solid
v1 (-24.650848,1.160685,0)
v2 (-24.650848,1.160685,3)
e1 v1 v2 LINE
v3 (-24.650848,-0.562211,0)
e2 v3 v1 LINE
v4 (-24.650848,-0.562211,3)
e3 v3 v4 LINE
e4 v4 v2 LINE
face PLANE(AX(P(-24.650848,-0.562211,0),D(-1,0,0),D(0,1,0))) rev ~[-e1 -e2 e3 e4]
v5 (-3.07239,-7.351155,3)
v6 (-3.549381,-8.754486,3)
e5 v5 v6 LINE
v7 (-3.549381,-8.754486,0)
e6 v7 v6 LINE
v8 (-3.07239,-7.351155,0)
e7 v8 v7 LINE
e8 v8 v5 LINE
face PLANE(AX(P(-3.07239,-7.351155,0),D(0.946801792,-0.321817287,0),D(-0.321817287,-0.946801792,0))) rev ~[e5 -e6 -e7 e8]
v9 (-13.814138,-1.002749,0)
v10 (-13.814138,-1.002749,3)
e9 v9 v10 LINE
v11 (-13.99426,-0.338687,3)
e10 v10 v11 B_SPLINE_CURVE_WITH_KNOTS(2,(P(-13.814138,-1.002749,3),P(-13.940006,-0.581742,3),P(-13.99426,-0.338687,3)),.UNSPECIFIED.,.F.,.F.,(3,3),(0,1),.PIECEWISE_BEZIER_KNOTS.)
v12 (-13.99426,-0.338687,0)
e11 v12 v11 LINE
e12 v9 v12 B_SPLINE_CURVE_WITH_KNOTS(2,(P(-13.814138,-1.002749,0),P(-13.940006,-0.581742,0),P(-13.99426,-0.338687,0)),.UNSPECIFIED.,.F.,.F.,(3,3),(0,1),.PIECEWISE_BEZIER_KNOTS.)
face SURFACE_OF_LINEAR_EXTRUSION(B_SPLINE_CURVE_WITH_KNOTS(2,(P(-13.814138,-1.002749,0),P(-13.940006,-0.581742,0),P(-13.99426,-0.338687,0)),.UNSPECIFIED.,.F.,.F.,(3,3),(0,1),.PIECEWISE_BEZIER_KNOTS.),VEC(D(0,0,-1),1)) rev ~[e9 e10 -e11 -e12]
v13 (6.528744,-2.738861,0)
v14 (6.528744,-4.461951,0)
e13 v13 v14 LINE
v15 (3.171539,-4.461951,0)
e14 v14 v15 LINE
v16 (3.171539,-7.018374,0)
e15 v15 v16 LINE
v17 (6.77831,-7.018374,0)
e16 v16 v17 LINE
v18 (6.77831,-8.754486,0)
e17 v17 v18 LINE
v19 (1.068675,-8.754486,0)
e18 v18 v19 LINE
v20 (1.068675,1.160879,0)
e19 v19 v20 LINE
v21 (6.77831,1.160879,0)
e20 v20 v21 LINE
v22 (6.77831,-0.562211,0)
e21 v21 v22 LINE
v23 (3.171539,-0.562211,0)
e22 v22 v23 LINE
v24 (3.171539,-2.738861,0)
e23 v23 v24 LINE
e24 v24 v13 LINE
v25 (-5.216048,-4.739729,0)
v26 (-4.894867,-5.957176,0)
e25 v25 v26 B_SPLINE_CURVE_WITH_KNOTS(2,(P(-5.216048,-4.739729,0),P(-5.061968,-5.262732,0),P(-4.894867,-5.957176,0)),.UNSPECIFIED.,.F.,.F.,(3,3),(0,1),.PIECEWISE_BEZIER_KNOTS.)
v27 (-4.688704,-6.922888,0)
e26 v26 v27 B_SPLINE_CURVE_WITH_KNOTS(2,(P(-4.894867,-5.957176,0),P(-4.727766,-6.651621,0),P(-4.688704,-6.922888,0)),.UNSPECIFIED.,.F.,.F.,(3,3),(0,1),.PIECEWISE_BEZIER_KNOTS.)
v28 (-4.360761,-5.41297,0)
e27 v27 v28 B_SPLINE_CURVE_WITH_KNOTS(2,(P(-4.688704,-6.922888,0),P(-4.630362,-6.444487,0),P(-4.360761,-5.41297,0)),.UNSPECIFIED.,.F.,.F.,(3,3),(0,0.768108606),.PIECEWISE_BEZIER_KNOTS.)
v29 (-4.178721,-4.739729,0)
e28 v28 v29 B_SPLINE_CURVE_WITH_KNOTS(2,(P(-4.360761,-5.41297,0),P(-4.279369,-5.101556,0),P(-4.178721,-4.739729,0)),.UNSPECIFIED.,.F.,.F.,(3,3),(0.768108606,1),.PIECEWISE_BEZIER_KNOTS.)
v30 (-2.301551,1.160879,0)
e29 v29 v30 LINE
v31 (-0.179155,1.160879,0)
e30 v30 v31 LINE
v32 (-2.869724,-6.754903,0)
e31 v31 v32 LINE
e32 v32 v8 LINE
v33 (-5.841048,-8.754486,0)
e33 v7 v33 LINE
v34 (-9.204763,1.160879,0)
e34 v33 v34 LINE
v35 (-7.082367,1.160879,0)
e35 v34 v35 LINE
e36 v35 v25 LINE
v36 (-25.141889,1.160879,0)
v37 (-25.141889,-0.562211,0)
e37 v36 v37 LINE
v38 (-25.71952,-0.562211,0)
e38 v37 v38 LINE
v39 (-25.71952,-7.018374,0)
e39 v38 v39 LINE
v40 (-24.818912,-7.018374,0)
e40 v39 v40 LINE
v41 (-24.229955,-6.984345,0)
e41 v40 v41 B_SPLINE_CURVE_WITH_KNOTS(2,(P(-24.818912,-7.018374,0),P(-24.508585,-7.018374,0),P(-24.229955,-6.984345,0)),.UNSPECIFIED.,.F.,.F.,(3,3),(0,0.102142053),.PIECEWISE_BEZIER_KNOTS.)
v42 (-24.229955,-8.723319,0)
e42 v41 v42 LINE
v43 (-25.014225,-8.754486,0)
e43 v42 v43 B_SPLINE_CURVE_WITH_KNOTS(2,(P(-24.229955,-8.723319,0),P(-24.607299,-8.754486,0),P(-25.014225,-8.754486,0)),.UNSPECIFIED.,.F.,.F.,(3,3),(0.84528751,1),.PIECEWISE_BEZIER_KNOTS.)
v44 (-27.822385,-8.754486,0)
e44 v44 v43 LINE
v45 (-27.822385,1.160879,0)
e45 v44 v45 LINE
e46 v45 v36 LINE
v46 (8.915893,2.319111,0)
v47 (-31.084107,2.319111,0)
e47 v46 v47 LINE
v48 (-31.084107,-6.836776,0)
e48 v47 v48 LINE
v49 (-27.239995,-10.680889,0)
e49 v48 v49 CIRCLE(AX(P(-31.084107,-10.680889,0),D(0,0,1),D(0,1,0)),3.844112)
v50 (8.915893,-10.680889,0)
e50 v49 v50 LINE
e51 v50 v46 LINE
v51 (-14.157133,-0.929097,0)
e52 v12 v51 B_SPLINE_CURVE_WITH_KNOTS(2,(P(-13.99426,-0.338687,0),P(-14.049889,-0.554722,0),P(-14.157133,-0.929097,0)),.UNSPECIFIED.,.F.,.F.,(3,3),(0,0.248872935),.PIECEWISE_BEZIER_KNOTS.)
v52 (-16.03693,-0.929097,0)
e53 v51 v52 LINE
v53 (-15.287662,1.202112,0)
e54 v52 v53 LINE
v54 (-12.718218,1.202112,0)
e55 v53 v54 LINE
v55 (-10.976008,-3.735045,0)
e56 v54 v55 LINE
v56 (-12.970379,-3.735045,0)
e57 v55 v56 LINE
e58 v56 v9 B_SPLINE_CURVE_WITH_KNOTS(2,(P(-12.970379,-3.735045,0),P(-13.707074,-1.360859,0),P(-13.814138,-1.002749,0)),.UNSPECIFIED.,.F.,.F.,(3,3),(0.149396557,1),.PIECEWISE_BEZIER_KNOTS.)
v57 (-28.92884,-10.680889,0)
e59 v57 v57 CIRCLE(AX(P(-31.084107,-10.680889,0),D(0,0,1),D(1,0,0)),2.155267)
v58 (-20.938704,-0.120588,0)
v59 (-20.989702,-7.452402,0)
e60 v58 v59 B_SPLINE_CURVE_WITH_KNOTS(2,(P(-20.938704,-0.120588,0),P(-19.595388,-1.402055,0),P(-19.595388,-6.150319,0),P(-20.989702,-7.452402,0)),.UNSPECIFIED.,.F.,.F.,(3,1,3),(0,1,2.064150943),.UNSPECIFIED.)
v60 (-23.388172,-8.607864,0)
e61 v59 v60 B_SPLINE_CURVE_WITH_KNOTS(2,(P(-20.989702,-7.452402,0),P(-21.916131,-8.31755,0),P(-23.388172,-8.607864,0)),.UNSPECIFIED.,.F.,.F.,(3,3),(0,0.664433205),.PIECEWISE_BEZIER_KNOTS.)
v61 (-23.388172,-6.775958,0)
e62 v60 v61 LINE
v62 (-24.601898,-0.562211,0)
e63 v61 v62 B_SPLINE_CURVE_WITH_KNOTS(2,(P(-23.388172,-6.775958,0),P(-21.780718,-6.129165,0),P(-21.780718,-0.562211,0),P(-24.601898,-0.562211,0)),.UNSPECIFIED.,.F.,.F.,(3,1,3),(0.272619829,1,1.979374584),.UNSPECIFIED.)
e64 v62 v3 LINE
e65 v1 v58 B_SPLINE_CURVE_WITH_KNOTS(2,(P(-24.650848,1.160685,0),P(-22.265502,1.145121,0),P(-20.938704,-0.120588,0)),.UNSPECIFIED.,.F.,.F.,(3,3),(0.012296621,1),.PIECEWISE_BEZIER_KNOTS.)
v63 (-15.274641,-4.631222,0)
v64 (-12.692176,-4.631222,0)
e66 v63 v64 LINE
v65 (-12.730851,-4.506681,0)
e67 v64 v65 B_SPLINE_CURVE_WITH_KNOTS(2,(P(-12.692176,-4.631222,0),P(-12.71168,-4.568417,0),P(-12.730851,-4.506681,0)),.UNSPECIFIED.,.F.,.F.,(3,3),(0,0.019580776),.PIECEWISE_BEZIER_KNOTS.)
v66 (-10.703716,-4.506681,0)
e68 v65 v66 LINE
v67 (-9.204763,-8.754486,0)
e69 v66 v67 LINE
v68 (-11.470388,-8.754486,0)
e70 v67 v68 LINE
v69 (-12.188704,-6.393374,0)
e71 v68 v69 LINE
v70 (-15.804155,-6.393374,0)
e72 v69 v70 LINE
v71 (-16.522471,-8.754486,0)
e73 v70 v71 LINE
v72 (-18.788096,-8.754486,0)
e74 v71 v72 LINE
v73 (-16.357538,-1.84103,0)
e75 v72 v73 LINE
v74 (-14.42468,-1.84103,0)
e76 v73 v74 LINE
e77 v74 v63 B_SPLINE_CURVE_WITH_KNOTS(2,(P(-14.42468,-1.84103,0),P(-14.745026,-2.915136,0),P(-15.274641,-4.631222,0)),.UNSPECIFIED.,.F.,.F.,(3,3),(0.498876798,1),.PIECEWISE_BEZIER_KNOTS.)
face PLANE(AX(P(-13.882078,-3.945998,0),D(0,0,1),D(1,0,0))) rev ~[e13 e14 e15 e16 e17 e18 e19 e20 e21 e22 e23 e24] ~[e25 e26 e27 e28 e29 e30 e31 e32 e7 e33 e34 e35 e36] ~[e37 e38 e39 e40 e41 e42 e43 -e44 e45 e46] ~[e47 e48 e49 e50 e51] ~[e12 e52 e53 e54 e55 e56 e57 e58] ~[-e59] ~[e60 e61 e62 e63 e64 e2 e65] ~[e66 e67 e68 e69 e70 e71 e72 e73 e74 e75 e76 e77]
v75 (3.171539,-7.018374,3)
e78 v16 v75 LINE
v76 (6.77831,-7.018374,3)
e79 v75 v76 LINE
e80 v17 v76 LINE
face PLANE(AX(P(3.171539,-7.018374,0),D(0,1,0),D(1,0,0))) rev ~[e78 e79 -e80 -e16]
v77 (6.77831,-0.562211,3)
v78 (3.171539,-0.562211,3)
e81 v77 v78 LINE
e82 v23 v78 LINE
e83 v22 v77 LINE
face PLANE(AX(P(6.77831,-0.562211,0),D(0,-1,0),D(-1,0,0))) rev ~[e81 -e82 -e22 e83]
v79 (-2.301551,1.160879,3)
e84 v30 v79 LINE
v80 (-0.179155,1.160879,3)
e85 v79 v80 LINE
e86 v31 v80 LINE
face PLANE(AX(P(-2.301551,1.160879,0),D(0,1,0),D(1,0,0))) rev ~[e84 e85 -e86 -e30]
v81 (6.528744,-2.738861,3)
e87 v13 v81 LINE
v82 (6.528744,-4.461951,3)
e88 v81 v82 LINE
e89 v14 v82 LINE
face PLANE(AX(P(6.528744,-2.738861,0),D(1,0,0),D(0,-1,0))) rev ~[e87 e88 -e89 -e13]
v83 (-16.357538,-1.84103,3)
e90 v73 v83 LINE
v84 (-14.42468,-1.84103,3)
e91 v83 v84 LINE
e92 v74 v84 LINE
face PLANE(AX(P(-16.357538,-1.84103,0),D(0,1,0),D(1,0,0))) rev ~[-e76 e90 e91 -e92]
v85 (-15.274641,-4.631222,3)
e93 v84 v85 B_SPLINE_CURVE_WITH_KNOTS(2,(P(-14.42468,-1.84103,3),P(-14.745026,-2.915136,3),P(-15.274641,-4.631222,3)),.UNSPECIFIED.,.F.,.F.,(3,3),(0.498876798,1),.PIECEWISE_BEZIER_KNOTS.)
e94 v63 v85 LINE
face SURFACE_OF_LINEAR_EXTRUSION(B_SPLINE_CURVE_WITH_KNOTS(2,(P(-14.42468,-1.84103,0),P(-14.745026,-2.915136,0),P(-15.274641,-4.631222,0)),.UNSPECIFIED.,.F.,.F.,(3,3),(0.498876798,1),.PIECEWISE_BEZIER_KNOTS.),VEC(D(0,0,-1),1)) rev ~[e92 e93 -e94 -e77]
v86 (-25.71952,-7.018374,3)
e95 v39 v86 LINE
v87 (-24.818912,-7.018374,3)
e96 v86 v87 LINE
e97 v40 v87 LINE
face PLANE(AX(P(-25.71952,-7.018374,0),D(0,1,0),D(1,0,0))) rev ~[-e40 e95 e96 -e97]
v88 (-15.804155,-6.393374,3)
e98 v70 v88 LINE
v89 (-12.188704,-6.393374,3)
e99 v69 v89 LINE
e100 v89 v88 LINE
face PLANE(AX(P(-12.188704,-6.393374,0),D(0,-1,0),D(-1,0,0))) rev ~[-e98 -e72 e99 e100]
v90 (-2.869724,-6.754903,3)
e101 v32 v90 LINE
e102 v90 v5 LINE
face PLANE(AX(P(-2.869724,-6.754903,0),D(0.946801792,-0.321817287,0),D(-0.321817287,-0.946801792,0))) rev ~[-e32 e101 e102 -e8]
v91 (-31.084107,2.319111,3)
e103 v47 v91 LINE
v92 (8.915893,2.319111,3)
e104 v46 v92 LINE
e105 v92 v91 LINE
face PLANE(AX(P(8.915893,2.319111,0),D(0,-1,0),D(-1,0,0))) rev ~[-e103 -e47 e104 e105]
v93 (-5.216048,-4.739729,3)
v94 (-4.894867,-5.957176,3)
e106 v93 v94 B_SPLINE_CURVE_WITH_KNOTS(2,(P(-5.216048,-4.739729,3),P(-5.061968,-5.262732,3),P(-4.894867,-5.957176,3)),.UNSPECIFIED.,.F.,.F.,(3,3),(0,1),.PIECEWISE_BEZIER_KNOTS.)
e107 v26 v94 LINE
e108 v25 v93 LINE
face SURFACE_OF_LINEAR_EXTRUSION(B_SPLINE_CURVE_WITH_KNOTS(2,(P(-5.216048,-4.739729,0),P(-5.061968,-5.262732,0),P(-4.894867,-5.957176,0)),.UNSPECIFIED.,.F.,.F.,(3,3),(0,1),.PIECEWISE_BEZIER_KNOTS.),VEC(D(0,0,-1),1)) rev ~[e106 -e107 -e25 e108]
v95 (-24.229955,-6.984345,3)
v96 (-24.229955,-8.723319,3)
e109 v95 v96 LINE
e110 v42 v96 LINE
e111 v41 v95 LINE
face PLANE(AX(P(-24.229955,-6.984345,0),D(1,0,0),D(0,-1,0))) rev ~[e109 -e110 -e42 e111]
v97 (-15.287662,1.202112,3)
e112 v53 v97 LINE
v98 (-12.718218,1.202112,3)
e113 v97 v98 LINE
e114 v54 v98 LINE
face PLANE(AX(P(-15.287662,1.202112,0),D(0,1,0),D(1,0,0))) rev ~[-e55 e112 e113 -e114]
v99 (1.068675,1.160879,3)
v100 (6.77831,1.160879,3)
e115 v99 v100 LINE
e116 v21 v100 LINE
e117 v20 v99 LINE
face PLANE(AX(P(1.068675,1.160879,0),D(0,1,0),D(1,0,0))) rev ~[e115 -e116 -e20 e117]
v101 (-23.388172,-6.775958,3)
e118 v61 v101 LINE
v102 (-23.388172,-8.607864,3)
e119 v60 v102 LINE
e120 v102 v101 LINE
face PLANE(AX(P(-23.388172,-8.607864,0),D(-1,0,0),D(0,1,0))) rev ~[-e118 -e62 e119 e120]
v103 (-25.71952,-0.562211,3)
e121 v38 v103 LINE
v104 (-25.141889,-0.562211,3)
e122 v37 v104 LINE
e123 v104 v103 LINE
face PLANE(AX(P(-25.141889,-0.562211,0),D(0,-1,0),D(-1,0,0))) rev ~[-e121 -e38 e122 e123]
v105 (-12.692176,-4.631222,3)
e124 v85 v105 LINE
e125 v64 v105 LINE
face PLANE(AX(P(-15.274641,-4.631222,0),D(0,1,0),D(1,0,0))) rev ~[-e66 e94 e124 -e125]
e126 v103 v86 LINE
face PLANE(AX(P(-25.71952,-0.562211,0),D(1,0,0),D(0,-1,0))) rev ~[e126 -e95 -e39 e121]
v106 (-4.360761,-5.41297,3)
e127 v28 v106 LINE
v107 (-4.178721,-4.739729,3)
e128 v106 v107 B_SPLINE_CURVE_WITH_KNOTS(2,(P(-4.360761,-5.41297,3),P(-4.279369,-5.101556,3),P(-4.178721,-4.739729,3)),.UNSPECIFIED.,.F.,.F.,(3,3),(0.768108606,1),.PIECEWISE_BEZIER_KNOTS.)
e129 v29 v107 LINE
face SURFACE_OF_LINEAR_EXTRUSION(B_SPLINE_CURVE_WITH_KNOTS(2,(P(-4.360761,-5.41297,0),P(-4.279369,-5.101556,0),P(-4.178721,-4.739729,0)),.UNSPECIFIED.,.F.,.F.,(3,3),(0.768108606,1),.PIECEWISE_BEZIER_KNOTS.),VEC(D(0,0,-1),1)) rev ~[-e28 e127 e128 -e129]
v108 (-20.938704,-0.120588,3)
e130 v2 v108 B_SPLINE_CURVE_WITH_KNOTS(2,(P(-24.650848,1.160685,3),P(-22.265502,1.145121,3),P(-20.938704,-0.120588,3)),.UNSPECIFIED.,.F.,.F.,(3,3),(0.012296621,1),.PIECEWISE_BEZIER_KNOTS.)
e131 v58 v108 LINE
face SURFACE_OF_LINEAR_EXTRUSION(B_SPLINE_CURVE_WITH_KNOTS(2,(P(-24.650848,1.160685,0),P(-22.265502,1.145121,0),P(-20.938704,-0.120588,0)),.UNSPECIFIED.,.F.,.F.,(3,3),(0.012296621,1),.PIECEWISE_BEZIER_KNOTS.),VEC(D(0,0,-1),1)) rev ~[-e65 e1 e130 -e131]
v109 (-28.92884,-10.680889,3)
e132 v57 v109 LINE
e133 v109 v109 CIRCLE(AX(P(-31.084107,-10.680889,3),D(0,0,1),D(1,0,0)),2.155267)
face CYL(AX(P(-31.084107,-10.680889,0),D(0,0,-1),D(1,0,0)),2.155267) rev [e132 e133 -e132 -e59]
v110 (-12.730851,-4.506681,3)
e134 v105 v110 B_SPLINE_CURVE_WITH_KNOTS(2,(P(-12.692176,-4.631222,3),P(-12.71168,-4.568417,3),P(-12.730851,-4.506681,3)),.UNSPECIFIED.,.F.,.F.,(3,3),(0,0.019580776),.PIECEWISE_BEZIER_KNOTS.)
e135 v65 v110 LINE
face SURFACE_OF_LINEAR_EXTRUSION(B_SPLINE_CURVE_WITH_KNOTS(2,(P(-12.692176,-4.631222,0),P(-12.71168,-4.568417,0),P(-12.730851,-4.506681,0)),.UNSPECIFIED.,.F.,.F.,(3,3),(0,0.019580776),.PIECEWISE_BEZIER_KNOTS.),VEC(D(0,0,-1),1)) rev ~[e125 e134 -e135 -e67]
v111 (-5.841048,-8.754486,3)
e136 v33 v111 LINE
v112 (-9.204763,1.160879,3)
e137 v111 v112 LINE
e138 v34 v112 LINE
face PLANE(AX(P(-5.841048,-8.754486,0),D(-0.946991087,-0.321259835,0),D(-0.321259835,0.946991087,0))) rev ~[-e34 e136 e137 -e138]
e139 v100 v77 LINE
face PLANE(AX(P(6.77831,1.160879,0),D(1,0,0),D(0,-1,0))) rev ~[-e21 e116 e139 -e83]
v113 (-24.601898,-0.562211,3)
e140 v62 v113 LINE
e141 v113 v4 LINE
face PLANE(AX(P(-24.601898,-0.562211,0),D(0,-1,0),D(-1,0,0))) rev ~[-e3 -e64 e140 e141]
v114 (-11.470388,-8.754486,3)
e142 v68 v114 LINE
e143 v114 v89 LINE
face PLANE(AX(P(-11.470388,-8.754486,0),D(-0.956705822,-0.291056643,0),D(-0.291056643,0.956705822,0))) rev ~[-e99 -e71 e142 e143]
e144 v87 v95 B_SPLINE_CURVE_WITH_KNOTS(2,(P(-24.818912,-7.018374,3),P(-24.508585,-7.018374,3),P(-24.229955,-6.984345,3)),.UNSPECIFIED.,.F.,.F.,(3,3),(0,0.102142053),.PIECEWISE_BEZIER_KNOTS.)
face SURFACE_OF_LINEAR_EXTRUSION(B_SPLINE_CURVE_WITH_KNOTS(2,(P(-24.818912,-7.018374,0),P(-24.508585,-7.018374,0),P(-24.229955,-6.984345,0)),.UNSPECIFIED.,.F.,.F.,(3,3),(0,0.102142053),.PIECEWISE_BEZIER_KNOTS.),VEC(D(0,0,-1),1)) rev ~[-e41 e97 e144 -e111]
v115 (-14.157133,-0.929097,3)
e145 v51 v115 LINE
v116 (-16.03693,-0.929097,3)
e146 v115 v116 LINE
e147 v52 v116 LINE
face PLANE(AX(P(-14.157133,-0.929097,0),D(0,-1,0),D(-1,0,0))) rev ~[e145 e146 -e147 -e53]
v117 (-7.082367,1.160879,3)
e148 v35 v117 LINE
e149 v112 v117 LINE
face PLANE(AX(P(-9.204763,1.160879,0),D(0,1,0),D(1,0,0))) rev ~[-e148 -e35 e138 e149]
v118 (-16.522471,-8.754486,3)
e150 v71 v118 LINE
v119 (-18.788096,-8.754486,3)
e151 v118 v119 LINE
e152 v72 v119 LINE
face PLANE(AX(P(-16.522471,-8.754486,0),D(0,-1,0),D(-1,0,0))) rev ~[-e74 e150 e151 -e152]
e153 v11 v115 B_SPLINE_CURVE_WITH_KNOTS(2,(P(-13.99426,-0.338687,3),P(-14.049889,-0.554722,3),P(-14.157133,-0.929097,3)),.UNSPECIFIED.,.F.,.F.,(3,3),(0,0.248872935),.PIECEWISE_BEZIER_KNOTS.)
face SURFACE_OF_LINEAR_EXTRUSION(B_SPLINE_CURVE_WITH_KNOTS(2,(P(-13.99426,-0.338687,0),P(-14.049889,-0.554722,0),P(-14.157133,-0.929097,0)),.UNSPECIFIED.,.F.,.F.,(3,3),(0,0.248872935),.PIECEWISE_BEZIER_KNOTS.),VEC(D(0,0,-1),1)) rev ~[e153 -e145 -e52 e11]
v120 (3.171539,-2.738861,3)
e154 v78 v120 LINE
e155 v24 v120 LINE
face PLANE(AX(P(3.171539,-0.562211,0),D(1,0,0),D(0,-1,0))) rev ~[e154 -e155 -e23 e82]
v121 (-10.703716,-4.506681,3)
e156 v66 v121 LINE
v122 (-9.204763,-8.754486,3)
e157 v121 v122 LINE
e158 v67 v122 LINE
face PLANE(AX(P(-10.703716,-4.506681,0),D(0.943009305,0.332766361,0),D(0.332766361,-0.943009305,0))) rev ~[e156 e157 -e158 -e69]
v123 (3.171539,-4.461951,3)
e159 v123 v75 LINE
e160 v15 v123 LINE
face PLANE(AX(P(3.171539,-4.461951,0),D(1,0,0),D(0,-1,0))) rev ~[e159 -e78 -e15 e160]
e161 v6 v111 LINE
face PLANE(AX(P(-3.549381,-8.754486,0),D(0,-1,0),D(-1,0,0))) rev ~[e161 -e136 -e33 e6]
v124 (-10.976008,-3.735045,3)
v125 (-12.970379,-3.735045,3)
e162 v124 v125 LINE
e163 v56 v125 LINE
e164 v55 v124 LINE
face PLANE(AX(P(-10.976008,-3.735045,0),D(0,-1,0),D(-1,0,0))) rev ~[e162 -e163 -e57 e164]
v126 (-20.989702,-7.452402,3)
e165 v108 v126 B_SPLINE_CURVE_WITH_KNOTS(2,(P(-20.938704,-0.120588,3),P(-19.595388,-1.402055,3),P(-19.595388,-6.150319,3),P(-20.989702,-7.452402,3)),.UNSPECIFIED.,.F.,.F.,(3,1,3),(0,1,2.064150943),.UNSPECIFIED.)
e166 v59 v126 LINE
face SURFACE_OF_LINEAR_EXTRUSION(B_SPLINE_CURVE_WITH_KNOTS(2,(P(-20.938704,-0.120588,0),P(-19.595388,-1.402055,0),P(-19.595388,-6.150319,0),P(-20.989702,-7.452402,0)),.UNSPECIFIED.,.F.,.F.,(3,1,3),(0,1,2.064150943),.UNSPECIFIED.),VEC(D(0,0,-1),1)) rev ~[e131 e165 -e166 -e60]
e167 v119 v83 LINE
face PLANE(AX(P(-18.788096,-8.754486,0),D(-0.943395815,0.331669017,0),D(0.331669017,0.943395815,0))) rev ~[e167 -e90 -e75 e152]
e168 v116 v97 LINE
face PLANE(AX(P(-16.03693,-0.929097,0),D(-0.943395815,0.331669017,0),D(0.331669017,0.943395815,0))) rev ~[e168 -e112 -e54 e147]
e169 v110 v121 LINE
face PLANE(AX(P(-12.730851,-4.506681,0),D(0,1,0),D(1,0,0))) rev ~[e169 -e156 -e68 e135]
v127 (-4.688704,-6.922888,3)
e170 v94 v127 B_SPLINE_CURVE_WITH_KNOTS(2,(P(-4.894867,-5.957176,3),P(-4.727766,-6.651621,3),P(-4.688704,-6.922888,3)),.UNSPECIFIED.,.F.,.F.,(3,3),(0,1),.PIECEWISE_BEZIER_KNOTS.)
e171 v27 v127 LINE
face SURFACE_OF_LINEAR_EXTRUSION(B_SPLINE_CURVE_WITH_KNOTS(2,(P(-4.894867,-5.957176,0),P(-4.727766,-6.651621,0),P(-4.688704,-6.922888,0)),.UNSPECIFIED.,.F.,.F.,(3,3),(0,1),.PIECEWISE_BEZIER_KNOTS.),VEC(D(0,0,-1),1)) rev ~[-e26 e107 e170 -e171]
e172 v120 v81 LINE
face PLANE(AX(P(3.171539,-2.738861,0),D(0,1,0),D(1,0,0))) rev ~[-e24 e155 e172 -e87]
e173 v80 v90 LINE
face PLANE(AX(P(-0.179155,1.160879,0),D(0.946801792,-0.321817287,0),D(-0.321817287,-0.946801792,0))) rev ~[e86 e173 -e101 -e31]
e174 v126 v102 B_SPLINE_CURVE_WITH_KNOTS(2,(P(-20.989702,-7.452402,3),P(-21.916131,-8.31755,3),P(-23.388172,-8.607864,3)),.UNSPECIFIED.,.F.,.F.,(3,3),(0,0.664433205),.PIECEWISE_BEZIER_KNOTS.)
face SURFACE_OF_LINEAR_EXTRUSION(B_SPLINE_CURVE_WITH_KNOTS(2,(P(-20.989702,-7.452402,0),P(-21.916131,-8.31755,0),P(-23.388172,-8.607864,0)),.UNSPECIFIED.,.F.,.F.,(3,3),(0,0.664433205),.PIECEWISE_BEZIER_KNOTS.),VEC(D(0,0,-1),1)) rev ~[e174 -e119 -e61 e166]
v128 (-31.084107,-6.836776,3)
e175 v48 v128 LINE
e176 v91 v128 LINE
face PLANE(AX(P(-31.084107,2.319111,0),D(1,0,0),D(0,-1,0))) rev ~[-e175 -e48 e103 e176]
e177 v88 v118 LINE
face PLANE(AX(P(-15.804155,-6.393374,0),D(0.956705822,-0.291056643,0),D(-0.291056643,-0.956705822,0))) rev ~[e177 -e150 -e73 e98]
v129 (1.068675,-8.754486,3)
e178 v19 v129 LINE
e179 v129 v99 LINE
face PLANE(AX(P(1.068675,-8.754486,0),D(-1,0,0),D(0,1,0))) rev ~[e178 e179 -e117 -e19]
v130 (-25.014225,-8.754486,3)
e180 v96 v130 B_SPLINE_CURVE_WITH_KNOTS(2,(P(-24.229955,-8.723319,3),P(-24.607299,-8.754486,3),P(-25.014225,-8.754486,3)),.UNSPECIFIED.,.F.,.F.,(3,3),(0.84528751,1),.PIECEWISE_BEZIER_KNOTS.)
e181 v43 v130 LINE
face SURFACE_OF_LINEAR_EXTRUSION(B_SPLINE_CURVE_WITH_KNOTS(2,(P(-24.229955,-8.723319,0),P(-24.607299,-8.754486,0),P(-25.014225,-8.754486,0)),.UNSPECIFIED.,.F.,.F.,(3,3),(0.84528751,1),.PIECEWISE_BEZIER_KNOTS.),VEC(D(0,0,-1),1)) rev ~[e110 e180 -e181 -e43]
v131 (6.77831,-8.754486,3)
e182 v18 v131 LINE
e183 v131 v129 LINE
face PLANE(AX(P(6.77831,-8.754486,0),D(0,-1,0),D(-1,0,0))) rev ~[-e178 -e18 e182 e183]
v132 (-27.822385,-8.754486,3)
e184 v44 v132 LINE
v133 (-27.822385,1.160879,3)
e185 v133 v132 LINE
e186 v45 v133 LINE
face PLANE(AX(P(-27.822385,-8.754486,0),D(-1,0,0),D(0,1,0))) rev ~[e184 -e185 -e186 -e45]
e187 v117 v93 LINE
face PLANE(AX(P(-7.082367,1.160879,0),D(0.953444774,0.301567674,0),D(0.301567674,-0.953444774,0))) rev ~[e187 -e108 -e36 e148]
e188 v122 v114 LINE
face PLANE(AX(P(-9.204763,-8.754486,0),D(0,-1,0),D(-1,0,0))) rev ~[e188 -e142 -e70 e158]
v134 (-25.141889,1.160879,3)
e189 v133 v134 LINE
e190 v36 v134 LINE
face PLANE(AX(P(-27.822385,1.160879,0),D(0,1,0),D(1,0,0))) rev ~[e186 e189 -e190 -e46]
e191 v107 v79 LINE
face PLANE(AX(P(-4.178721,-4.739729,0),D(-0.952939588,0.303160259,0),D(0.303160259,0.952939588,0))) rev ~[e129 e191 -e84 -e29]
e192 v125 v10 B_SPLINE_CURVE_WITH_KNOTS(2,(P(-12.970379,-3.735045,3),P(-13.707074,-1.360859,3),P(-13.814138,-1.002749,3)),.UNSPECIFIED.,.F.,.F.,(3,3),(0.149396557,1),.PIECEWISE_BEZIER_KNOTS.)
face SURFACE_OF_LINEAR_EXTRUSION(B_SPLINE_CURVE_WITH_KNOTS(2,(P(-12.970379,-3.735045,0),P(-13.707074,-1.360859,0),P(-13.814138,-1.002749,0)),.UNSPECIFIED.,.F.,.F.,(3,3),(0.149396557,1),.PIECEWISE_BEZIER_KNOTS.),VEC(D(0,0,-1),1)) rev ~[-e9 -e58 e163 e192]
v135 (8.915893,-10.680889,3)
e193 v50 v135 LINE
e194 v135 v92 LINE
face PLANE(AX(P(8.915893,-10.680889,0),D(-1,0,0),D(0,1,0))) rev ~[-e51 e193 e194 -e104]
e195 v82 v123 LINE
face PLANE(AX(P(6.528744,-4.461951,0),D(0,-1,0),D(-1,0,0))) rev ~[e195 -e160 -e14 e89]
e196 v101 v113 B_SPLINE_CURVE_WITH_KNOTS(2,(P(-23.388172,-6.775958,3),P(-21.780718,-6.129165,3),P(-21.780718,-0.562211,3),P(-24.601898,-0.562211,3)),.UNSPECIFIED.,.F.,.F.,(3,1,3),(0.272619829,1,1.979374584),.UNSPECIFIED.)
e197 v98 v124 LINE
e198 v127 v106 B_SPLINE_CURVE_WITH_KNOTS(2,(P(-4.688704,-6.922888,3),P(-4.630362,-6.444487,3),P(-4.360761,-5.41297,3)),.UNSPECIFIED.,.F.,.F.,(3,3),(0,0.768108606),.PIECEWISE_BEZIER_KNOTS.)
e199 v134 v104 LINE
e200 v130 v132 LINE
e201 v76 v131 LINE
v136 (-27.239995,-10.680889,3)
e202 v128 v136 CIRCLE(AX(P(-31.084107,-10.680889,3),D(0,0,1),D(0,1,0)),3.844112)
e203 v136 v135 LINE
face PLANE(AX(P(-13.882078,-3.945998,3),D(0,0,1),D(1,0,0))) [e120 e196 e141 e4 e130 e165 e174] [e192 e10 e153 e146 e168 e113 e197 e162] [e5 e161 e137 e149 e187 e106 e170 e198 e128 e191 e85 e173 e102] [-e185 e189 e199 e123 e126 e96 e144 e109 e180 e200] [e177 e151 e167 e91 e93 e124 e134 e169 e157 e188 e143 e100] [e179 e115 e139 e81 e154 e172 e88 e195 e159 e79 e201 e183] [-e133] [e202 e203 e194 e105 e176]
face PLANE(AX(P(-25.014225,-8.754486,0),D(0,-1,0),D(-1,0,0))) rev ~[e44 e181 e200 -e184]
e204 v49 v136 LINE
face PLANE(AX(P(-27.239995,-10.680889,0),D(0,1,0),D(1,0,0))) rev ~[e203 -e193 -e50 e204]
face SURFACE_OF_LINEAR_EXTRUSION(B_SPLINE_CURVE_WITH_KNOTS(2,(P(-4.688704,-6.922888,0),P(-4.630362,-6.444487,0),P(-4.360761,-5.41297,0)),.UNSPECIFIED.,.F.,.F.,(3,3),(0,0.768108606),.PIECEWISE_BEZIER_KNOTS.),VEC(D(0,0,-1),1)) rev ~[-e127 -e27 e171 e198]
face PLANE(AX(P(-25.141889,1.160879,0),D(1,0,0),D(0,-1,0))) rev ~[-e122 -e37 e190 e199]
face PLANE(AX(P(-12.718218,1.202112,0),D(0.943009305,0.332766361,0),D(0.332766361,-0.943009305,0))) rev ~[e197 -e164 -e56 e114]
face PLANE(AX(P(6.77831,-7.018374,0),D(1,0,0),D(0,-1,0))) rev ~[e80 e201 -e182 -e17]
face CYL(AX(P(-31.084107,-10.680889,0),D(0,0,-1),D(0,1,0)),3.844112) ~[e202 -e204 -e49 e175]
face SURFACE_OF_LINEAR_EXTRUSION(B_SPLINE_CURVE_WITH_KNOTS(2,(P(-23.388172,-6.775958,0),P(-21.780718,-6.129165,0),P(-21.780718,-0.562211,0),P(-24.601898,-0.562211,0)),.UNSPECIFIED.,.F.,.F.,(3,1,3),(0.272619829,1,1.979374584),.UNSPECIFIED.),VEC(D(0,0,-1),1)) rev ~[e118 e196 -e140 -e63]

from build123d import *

# Parameters (mm, degrees)
F0_R     = 2.1552668946
F1_DEPTH = 3
F2_DEPTH = 3
F3_DEPTH = 3


# Not quite as in the source:
# - a feature names something its author has since deleted; it is built from what else it names


with BuildPart() as f1:
    # F0 (on Top) → F1 (new body)
    with BuildSketch(Plane.XY):
        with BuildLine():
            Line((8.9158927649, 2.3191112205), (-31.0841072351, 2.3191112205))
            Line((-31.0841072351, 2.3191112205), (-31.0841072351, -6.8367764676))
            ThreePointArc((-31.0841072351, -6.8367764676), (-29.2190156428, -7.3195448787), (-27.8223845073, -8.6465917722))
            Line((-27.8223845073, -8.6465917722), (-27.8223845073, 1.160879073))
            Line((-27.8223845073, 1.160879073), (-25.1418892294, 1.160879073))
            Line((-25.1418892294, 1.160879073), (-24.7104053406, 1.160879073))
            add(Edge.make_bspline(
                [(-24.7104053406, 1.160879073), (-24.680544405, 1.160879073), (-24.6508475393, 1.1606853064)],
                knots=[0, 0, 0, 0.0122966212, 0.0122966212, 0.0122966212], degree=2))
            add(Edge.make_bspline(
                [(-24.6508475393, 1.1606853064), (-22.2655016763, 1.1451213586), (-20.9387039517, -0.1205879408)],
                knots=[0.0122966212, 0.0122966212, 0.0122966212, 1, 1, 1], degree=2))
            add(Edge.make_bspline(
                [(-20.9387039517, -0.1205879408), (-19.5953879795, -1.4020549547), (-19.5953879795, -3.702402177)],
                knots=[0, 0, 0, 1, 1, 1], degree=2))
            add(Edge.make_bspline(
                [(-19.5953879795, -3.702402177), (-19.5953879795, -6.1503188436), (-20.9897022156, -7.452402177)],
                knots=[0, 0, 0, 1, 1, 1], degree=2))
            add(Edge.make_bspline(
                [(-20.9897022156, -7.452402177), (-21.9161308918, -8.3175495789), (-23.3881715685, -8.60786432)],
                knots=[0, 0, 0, 0.6644332047, 0.6644332047, 0.6644332047], degree=2))
            add(Edge.make_bspline(
                [(-23.3881715685, -8.60786432), (-23.7888512634, -8.6868860643), (-24.2299549282, -8.7233189027)],
                knots=[0.6644332047, 0.6644332047, 0.6644332047, 0.8452875098, 0.8452875098, 0.8452875098], degree=2))
            add(Edge.make_bspline(
                [(-24.2299549282, -8.7233189027), (-24.6072987041, -8.7544855103), (-25.0142247851, -8.7544855103)],
                knots=[0.8452875098, 0.8452875098, 0.8452875098, 1, 1, 1], degree=2))
            Line((-25.0142247851, -8.7544855103), (-27.7575219121, -8.7544855103))
            ThreePointArc((-27.7575219121, -8.7544855103), (-27.3716304969, -9.6835343114), (-27.2399949232, -10.6808887795))
            Line((-27.2399949232, -10.6808887795), (8.9158927649, -10.6808887795))
            Line((8.9158927649, -10.6808887795), (8.9158927649, 2.3191112205))
        make_face()
        Polygon((-10.9760084531, -3.7350449711), (-10.7037159156, -4.5066806488), (-9.2047629795, -8.7544855103), (-11.4703879795, -8.7544855103), (-12.1887039517, -6.3933743992), (-15.8041553406, -6.3933743992), (-16.5224713128, -8.7544855103), (-18.7880963128, -8.7544855103), (-16.3575375911, -1.8410302), (-16.0369298862, -0.9290970629), (-15.2876622851, 1.2021117119), (-12.7182178406, 1.2021117119), align=None, mode=Mode.SUBTRACT)
        with BuildLine():
            Line((-0.1791553406, 1.160879073), (-2.8697243415, -6.7549031323))
            Line((-2.8697243415, -6.7549031323), (-3.0723898417, -7.3511546909))
            Line((-3.0723898417, -7.3511546909), (-3.5493810351, -8.7544855103))
            Line((-3.5493810351, -8.7544855103), (-5.8410477017, -8.7544855103))
            Line((-5.8410477017, -8.7544855103), (-9.2047629795, 1.160879073))
            Line((-9.2047629795, 1.160879073), (-7.0823671462, 1.160879073))
            Line((-7.0823671462, 1.160879073), (-5.2160477017, -4.7397285658))
            add(Edge.make_bspline(
                [(-5.2160477017, -4.7397285658), (-5.0619678406, -5.2627320381), (-4.8948671462, -5.9571764825)],
                knots=[0, 0, 0, 1, 1, 1], degree=2))
            add(Edge.make_bspline(
                [(-4.8948671462, -5.9571764825), (-4.7277664517, -6.651620927), (-4.6887039517, -6.9228882881)],
                knots=[0, 0, 0, 1, 1, 1], degree=2))
            add(Edge.make_bspline(
                [(-4.6887039517, -6.9228882881), (-4.6303623692, -6.4444873114), (-4.360761049, -5.4129699306)],
                knots=[0, 0, 0, 0.7681086064, 0.7681086064, 0.7681086064], degree=2))
            add(Edge.make_bspline(
                [(-4.360761049, -5.4129699306), (-4.2793686191, -5.1015556319), (-4.1787213128, -4.7397285658)],
                knots=[0.7681086064, 0.7681086064, 0.7681086064, 1, 1, 1], degree=2))
            Line((-4.1787213128, -4.7397285658), (-2.301551174, 1.160879073))
            Line((-2.301551174, 1.160879073), (-0.1791553406, 1.160879073))
        make_face(mode=Mode.SUBTRACT)
        Polygon((6.7783099372, -7.0183743992), (6.7783099372, -8.7544855103), (1.0686745205, -8.7544855103), (1.0686745205, 1.160879073), (6.7783099372, 1.160879073), (6.7783099372, -0.5622112047), (3.1715391038, -0.5622112047), (3.1715391038, -2.7388605103), (6.5287439649, -2.7388605103), (6.5287439649, -4.4619507881), (3.1715391038, -4.4619507881), (3.1715391038, -7.0183743992), align=None, mode=Mode.SUBTRACT)
        with BuildLine():
            ThreePointArc((-27.8223845073, -8.6465917722), (-29.2190156428, -7.3195448787), (-31.0841072351, -6.8367764676))
            ThreePointArc((-31.0841072351, -6.8367764676), (-33.8023051185, -13.3990866629), (-27.2399949232, -10.6808887795))
            ThreePointArc((-27.2399949232, -10.6808887795), (-27.3716304969, -9.6835343114), (-27.7575219121, -8.7544855103))
            Line((-27.7575219121, -8.7544855103), (-27.8223845073, -8.7544855103))
            Line((-27.8223845073, -8.7544855103), (-27.8223845073, -8.6465917722))
        make_face()
        with Locations((-31.0841072351, -10.6808887795)):
            Circle(F0_R, mode=Mode.SUBTRACT)
        with BuildLine():
            Line((-24.6508475393, -0.5622112047), (-25.1418892294, -0.5622112047))
            Line((-25.1418892294, -0.5622112047), (-25.719519924, -0.5622112047))
            Line((-25.719519924, -0.5622112047), (-25.719519924, -7.0183743992))
            Line((-25.719519924, -7.0183743992), (-24.8189122851, -7.0183743992))
            add(Edge.make_bspline(
                [(-24.8189122851, -7.0183743992), (-24.5085848668, -7.0183743992), (-24.2299549282, -6.9843448907)],
                knots=[0, 0, 0, 0.1021420531, 0.1021420531, 0.1021420531], degree=2))
            add(Edge.make_bspline(
                [(-24.2299549282, -6.9843448907), (-23.7649142238, -6.9275487449), (-23.3881715685, -6.7759583364)],
                knots=[0.1021420531, 0.1021420531, 0.1021420531, 0.2726198293, 0.2726198293, 0.2726198293], degree=2))
            add(Edge.make_bspline(
                [(-23.3881715685, -6.7759583364), (-21.7807178406, -6.1291651903), (-21.7807178406, -3.7566556492)],
                knots=[0.2726198293, 0.2726198293, 0.2726198293, 1, 1, 1], degree=2))
            add(Edge.make_bspline(
                [(-21.7807178406, -3.7566556492), (-21.7807178406, -0.5622112047), (-24.6018983962, -0.5622112047)],
                knots=[0, 0, 0, 1, 1, 1], degree=2))
            Line((-24.6018983962, -0.5622112047), (-24.6508475393, -0.5622112047))
        make_face()
        with BuildLine():
            add(Edge.make_bspline(
                [(-12.692176174, -4.6312216214), (-12.7116804628, -4.5684169616), (-12.7308511011, -4.5066806488)],
                knots=[0, 0, 0, 0.0195807762, 0.0195807762, 0.0195807762], degree=2))
            add(Edge.make_bspline(
                [(-12.7308511011, -4.5066806488), (-12.8579477675, -4.0973839213), (-12.9703792713, -3.7350449711)],
                knots=[0.0195807762, 0.0195807762, 0.0195807762, 0.1493965567, 0.1493965567, 0.1493965567], degree=2))
            add(Edge.make_bspline(
                [(-12.9703792713, -3.7350449711), (-13.7070741781, -1.3608593558), (-13.8141379795, -1.0027493992)],
                knots=[0.1493965567, 0.1493965567, 0.1493965567, 1, 1, 1], degree=2))
            add(Edge.make_bspline(
                [(-13.8141379795, -1.0027493992), (-13.9400060351, -0.5817424547), (-13.9942595073, -0.3386868992)],
                knots=[0, 0, 0, 1, 1, 1], degree=2))
            add(Edge.make_bspline(
                [(-13.9942595073, -0.3386868992), (-14.0498886573, -0.5547224332), (-14.1571325889, -0.9290970629)],
                knots=[0, 0, 0, 0.2488729353, 0.2488729353, 0.2488729353], degree=2))
            add(Edge.make_bspline(
                [(-14.1571325889, -0.9290970629), (-14.2648638581, -1.3051729247), (-14.4246800702, -1.8410302)],
                knots=[0.2488729353, 0.2488729353, 0.2488729353, 0.4988767982, 0.4988767982, 0.4988767982], degree=2))
            add(Edge.make_bspline(
                [(-14.4246800702, -1.8410302), (-14.7450255679, -2.915135657), (-15.2746414517, -4.6312216214)],
                knots=[0.4988767982, 0.4988767982, 0.4988767982, 1, 1, 1], degree=2))
            Line((-15.2746414517, -4.6312216214), (-12.692176174, -4.6312216214))
        make_face()
        with BuildLine():
            Line((-16.3575375911, -1.8410302), (-14.4246800702, -1.8410302))
            add(Edge.make_bspline(
                [(-14.1571325889, -0.9290970629), (-14.2648638581, -1.3051729247), (-14.4246800702, -1.8410302)],
                knots=[0.2488729353, 0.2488729353, 0.2488729353, 0.4988767982, 0.4988767982, 0.4988767982], degree=2))
            Line((-14.1571325889, -0.9290970629), (-16.0369298862, -0.9290970629))
            Line((-16.0369298862, -0.9290970629), (-16.3575375911, -1.8410302))
        make_face()
        with BuildLine():
            add(Edge.make_bspline(
                [(-12.7308511011, -4.5066806488), (-12.8579477675, -4.0973839213), (-12.9703792713, -3.7350449711)],
                knots=[0.0195807762, 0.0195807762, 0.0195807762, 0.1493965567, 0.1493965567, 0.1493965567], degree=2))
            Line((-12.7308511011, -4.5066806488), (-10.7037159156, -4.5066806488))
            Line((-10.7037159156, -4.5066806488), (-10.9760084531, -3.7350449711))
            Line((-10.9760084531, -3.7350449711), (-12.9703792713, -3.7350449711))
        make_face()
        with BuildLine():
            Line((-24.2299549282, -6.9843448907), (-24.2299549282, -8.7233189027))
            add(Edge.make_bspline(
                [(-23.3881715685, -8.60786432), (-23.7888512634, -8.6868860643), (-24.2299549282, -8.7233189027)],
                knots=[0.6644332047, 0.6644332047, 0.6644332047, 0.8452875098, 0.8452875098, 0.8452875098], degree=2))
            Line((-23.3881715685, -8.60786432), (-23.3881715685, -6.7759583364))
            add(Edge.make_bspline(
                [(-24.2299549282, -6.9843448907), (-23.7649142238, -6.9275487449), (-23.3881715685, -6.7759583364)],
                knots=[0.1021420531, 0.1021420531, 0.1021420531, 0.2726198293, 0.2726198293, 0.2726198293], degree=2))
        make_face()
        with BuildLine():
            Line((-24.7104053406, 1.160879073), (-25.1418892294, 1.160879073))
            Line((-25.1418892294, 1.160879073), (-25.1418892294, -0.5622112047))
            Line((-25.1418892294, -0.5622112047), (-24.6508475393, -0.5622112047))
            Line((-24.6508475393, -0.5622112047), (-24.6508475393, 1.1606853064))
            add(Edge.make_bspline(
                [(-24.7104053406, 1.160879073), (-24.680544405, 1.160879073), (-24.6508475393, 1.1606853064)],
                knots=[0, 0, 0, 0.0122966212, 0.0122966212, 0.0122966212], degree=2))
        make_face()
    extrude(amount=F1_DEPTH)

    # F0 (on Top) → F2 (join)
    with BuildSketch(Plane.XY):
        with BuildLine():
            ThreePointArc((-27.8223845073, -8.6465917722), (-29.2190156428, -7.3195448787), (-31.0841072351, -6.8367764676))
            ThreePointArc((-31.0841072351, -6.8367764676), (-33.8023051185, -13.3990866629), (-27.2399949232, -10.6808887795))
            ThreePointArc((-27.2399949232, -10.6808887795), (-27.3716304969, -9.6835343114), (-27.7575219121, -8.7544855103))
            Line((-27.7575219121, -8.7544855103), (-27.8223845073, -8.7544855103))
            Line((-27.8223845073, -8.7544855103), (-27.8223845073, -8.6465917722))
        make_face()
        with Locations((-31.0841072351, -10.6808887795)):
            Circle(F0_R, mode=Mode.SUBTRACT)
    extrude(amount=F2_DEPTH)

    # F0 (on Top) → F3 (join)
    with BuildSketch(Plane.XY):
        with BuildLine():
            Line((8.9158927649, 2.3191112205), (-31.0841072351, 2.3191112205))
            Line((-31.0841072351, 2.3191112205), (-31.0841072351, -6.8367764676))
            ThreePointArc((-31.0841072351, -6.8367764676), (-29.2190156428, -7.3195448787), (-27.8223845073, -8.6465917722))
            Line((-27.8223845073, -8.6465917722), (-27.8223845073, 1.160879073))
            Line((-27.8223845073, 1.160879073), (-25.1418892294, 1.160879073))
            Line((-25.1418892294, 1.160879073), (-24.7104053406, 1.160879073))
            add(Edge.make_bspline(
                [(-24.7104053406, 1.160879073), (-24.680544405, 1.160879073), (-24.6508475393, 1.1606853064)],
                knots=[0, 0, 0, 0.0122966212, 0.0122966212, 0.0122966212], degree=2))
            add(Edge.make_bspline(
                [(-24.6508475393, 1.1606853064), (-22.2655016763, 1.1451213586), (-20.9387039517, -0.1205879408)],
                knots=[0.0122966212, 0.0122966212, 0.0122966212, 1, 1, 1], degree=2))
            add(Edge.make_bspline(
                [(-20.9387039517, -0.1205879408), (-19.5953879795, -1.4020549547), (-19.5953879795, -3.702402177)],
                knots=[0, 0, 0, 1, 1, 1], degree=2))
            add(Edge.make_bspline(
                [(-19.5953879795, -3.702402177), (-19.5953879795, -6.1503188436), (-20.9897022156, -7.452402177)],
                knots=[0, 0, 0, 1, 1, 1], degree=2))
            add(Edge.make_bspline(
                [(-20.9897022156, -7.452402177), (-21.9161308918, -8.3175495789), (-23.3881715685, -8.60786432)],
                knots=[0, 0, 0, 0.6644332047, 0.6644332047, 0.6644332047], degree=2))
            add(Edge.make_bspline(
                [(-23.3881715685, -8.60786432), (-23.7888512634, -8.6868860643), (-24.2299549282, -8.7233189027)],
                knots=[0.6644332047, 0.6644332047, 0.6644332047, 0.8452875098, 0.8452875098, 0.8452875098], degree=2))
            add(Edge.make_bspline(
                [(-24.2299549282, -8.7233189027), (-24.6072987041, -8.7544855103), (-25.0142247851, -8.7544855103)],
                knots=[0.8452875098, 0.8452875098, 0.8452875098, 1, 1, 1], degree=2))
            Line((-25.0142247851, -8.7544855103), (-27.7575219121, -8.7544855103))
            ThreePointArc((-27.7575219121, -8.7544855103), (-27.3716304969, -9.6835343114), (-27.2399949232, -10.6808887795))
            Line((-27.2399949232, -10.6808887795), (8.9158927649, -10.6808887795))
            Line((8.9158927649, -10.6808887795), (8.9158927649, 2.3191112205))
        make_face()
        Polygon((-10.9760084531, -3.7350449711), (-10.7037159156, -4.5066806488), (-9.2047629795, -8.7544855103), (-11.4703879795, -8.7544855103), (-12.1887039517, -6.3933743992), (-15.8041553406, -6.3933743992), (-16.5224713128, -8.7544855103), (-18.7880963128, -8.7544855103), (-16.3575375911, -1.8410302), (-16.0369298862, -0.9290970629), (-15.2876622851, 1.2021117119), (-12.7182178406, 1.2021117119), align=None, mode=Mode.SUBTRACT)
        with BuildLine():
            Line((-0.1791553406, 1.160879073), (-2.8697243415, -6.7549031323))
            Line((-2.8697243415, -6.7549031323), (-3.0723898417, -7.3511546909))
            Line((-3.0723898417, -7.3511546909), (-3.5493810351, -8.7544855103))
            Line((-3.5493810351, -8.7544855103), (-5.8410477017, -8.7544855103))
            Line((-5.8410477017, -8.7544855103), (-9.2047629795, 1.160879073))
            Line((-9.2047629795, 1.160879073), (-7.0823671462, 1.160879073))
            Line((-7.0823671462, 1.160879073), (-5.2160477017, -4.7397285658))
            add(Edge.make_bspline(
                [(-5.2160477017, -4.7397285658), (-5.0619678406, -5.2627320381), (-4.8948671462, -5.9571764825)],
                knots=[0, 0, 0, 1, 1, 1], degree=2))
            add(Edge.make_bspline(
                [(-4.8948671462, -5.9571764825), (-4.7277664517, -6.651620927), (-4.6887039517, -6.9228882881)],
                knots=[0, 0, 0, 1, 1, 1], degree=2))
            add(Edge.make_bspline(
                [(-4.6887039517, -6.9228882881), (-4.6303623692, -6.4444873114), (-4.360761049, -5.4129699306)],
                knots=[0, 0, 0, 0.7681086064, 0.7681086064, 0.7681086064], degree=2))
            add(Edge.make_bspline(
                [(-4.360761049, -5.4129699306), (-4.2793686191, -5.1015556319), (-4.1787213128, -4.7397285658)],
                knots=[0.7681086064, 0.7681086064, 0.7681086064, 1, 1, 1], degree=2))
            Line((-4.1787213128, -4.7397285658), (-2.301551174, 1.160879073))
            Line((-2.301551174, 1.160879073), (-0.1791553406, 1.160879073))
        make_face(mode=Mode.SUBTRACT)
        Polygon((6.7783099372, -7.0183743992), (6.7783099372, -8.7544855103), (1.0686745205, -8.7544855103), (1.0686745205, 1.160879073), (6.7783099372, 1.160879073), (6.7783099372, -0.5622112047), (3.1715391038, -0.5622112047), (3.1715391038, -2.7388605103), (6.5287439649, -2.7388605103), (6.5287439649, -4.4619507881), (3.1715391038, -4.4619507881), (3.1715391038, -7.0183743992), align=None, mode=Mode.SUBTRACT)
        with BuildLine():
            ThreePointArc((-27.8223845073, -8.6465917722), (-29.2190156428, -7.3195448787), (-31.0841072351, -6.8367764676))
            ThreePointArc((-31.0841072351, -6.8367764676), (-33.8023051185, -13.3990866629), (-27.2399949232, -10.6808887795))
            ThreePointArc((-27.2399949232, -10.6808887795), (-27.3716304969, -9.6835343114), (-27.7575219121, -8.7544855103))
            Line((-27.7575219121, -8.7544855103), (-27.8223845073, -8.7544855103))
            Line((-27.8223845073, -8.7544855103), (-27.8223845073, -8.6465917722))
        make_face()
        with Locations((-31.0841072351, -10.6808887795)):
            Circle(F0_R, mode=Mode.SUBTRACT)
    extrude(amount=F3_DEPTH)


solid = f1.part
